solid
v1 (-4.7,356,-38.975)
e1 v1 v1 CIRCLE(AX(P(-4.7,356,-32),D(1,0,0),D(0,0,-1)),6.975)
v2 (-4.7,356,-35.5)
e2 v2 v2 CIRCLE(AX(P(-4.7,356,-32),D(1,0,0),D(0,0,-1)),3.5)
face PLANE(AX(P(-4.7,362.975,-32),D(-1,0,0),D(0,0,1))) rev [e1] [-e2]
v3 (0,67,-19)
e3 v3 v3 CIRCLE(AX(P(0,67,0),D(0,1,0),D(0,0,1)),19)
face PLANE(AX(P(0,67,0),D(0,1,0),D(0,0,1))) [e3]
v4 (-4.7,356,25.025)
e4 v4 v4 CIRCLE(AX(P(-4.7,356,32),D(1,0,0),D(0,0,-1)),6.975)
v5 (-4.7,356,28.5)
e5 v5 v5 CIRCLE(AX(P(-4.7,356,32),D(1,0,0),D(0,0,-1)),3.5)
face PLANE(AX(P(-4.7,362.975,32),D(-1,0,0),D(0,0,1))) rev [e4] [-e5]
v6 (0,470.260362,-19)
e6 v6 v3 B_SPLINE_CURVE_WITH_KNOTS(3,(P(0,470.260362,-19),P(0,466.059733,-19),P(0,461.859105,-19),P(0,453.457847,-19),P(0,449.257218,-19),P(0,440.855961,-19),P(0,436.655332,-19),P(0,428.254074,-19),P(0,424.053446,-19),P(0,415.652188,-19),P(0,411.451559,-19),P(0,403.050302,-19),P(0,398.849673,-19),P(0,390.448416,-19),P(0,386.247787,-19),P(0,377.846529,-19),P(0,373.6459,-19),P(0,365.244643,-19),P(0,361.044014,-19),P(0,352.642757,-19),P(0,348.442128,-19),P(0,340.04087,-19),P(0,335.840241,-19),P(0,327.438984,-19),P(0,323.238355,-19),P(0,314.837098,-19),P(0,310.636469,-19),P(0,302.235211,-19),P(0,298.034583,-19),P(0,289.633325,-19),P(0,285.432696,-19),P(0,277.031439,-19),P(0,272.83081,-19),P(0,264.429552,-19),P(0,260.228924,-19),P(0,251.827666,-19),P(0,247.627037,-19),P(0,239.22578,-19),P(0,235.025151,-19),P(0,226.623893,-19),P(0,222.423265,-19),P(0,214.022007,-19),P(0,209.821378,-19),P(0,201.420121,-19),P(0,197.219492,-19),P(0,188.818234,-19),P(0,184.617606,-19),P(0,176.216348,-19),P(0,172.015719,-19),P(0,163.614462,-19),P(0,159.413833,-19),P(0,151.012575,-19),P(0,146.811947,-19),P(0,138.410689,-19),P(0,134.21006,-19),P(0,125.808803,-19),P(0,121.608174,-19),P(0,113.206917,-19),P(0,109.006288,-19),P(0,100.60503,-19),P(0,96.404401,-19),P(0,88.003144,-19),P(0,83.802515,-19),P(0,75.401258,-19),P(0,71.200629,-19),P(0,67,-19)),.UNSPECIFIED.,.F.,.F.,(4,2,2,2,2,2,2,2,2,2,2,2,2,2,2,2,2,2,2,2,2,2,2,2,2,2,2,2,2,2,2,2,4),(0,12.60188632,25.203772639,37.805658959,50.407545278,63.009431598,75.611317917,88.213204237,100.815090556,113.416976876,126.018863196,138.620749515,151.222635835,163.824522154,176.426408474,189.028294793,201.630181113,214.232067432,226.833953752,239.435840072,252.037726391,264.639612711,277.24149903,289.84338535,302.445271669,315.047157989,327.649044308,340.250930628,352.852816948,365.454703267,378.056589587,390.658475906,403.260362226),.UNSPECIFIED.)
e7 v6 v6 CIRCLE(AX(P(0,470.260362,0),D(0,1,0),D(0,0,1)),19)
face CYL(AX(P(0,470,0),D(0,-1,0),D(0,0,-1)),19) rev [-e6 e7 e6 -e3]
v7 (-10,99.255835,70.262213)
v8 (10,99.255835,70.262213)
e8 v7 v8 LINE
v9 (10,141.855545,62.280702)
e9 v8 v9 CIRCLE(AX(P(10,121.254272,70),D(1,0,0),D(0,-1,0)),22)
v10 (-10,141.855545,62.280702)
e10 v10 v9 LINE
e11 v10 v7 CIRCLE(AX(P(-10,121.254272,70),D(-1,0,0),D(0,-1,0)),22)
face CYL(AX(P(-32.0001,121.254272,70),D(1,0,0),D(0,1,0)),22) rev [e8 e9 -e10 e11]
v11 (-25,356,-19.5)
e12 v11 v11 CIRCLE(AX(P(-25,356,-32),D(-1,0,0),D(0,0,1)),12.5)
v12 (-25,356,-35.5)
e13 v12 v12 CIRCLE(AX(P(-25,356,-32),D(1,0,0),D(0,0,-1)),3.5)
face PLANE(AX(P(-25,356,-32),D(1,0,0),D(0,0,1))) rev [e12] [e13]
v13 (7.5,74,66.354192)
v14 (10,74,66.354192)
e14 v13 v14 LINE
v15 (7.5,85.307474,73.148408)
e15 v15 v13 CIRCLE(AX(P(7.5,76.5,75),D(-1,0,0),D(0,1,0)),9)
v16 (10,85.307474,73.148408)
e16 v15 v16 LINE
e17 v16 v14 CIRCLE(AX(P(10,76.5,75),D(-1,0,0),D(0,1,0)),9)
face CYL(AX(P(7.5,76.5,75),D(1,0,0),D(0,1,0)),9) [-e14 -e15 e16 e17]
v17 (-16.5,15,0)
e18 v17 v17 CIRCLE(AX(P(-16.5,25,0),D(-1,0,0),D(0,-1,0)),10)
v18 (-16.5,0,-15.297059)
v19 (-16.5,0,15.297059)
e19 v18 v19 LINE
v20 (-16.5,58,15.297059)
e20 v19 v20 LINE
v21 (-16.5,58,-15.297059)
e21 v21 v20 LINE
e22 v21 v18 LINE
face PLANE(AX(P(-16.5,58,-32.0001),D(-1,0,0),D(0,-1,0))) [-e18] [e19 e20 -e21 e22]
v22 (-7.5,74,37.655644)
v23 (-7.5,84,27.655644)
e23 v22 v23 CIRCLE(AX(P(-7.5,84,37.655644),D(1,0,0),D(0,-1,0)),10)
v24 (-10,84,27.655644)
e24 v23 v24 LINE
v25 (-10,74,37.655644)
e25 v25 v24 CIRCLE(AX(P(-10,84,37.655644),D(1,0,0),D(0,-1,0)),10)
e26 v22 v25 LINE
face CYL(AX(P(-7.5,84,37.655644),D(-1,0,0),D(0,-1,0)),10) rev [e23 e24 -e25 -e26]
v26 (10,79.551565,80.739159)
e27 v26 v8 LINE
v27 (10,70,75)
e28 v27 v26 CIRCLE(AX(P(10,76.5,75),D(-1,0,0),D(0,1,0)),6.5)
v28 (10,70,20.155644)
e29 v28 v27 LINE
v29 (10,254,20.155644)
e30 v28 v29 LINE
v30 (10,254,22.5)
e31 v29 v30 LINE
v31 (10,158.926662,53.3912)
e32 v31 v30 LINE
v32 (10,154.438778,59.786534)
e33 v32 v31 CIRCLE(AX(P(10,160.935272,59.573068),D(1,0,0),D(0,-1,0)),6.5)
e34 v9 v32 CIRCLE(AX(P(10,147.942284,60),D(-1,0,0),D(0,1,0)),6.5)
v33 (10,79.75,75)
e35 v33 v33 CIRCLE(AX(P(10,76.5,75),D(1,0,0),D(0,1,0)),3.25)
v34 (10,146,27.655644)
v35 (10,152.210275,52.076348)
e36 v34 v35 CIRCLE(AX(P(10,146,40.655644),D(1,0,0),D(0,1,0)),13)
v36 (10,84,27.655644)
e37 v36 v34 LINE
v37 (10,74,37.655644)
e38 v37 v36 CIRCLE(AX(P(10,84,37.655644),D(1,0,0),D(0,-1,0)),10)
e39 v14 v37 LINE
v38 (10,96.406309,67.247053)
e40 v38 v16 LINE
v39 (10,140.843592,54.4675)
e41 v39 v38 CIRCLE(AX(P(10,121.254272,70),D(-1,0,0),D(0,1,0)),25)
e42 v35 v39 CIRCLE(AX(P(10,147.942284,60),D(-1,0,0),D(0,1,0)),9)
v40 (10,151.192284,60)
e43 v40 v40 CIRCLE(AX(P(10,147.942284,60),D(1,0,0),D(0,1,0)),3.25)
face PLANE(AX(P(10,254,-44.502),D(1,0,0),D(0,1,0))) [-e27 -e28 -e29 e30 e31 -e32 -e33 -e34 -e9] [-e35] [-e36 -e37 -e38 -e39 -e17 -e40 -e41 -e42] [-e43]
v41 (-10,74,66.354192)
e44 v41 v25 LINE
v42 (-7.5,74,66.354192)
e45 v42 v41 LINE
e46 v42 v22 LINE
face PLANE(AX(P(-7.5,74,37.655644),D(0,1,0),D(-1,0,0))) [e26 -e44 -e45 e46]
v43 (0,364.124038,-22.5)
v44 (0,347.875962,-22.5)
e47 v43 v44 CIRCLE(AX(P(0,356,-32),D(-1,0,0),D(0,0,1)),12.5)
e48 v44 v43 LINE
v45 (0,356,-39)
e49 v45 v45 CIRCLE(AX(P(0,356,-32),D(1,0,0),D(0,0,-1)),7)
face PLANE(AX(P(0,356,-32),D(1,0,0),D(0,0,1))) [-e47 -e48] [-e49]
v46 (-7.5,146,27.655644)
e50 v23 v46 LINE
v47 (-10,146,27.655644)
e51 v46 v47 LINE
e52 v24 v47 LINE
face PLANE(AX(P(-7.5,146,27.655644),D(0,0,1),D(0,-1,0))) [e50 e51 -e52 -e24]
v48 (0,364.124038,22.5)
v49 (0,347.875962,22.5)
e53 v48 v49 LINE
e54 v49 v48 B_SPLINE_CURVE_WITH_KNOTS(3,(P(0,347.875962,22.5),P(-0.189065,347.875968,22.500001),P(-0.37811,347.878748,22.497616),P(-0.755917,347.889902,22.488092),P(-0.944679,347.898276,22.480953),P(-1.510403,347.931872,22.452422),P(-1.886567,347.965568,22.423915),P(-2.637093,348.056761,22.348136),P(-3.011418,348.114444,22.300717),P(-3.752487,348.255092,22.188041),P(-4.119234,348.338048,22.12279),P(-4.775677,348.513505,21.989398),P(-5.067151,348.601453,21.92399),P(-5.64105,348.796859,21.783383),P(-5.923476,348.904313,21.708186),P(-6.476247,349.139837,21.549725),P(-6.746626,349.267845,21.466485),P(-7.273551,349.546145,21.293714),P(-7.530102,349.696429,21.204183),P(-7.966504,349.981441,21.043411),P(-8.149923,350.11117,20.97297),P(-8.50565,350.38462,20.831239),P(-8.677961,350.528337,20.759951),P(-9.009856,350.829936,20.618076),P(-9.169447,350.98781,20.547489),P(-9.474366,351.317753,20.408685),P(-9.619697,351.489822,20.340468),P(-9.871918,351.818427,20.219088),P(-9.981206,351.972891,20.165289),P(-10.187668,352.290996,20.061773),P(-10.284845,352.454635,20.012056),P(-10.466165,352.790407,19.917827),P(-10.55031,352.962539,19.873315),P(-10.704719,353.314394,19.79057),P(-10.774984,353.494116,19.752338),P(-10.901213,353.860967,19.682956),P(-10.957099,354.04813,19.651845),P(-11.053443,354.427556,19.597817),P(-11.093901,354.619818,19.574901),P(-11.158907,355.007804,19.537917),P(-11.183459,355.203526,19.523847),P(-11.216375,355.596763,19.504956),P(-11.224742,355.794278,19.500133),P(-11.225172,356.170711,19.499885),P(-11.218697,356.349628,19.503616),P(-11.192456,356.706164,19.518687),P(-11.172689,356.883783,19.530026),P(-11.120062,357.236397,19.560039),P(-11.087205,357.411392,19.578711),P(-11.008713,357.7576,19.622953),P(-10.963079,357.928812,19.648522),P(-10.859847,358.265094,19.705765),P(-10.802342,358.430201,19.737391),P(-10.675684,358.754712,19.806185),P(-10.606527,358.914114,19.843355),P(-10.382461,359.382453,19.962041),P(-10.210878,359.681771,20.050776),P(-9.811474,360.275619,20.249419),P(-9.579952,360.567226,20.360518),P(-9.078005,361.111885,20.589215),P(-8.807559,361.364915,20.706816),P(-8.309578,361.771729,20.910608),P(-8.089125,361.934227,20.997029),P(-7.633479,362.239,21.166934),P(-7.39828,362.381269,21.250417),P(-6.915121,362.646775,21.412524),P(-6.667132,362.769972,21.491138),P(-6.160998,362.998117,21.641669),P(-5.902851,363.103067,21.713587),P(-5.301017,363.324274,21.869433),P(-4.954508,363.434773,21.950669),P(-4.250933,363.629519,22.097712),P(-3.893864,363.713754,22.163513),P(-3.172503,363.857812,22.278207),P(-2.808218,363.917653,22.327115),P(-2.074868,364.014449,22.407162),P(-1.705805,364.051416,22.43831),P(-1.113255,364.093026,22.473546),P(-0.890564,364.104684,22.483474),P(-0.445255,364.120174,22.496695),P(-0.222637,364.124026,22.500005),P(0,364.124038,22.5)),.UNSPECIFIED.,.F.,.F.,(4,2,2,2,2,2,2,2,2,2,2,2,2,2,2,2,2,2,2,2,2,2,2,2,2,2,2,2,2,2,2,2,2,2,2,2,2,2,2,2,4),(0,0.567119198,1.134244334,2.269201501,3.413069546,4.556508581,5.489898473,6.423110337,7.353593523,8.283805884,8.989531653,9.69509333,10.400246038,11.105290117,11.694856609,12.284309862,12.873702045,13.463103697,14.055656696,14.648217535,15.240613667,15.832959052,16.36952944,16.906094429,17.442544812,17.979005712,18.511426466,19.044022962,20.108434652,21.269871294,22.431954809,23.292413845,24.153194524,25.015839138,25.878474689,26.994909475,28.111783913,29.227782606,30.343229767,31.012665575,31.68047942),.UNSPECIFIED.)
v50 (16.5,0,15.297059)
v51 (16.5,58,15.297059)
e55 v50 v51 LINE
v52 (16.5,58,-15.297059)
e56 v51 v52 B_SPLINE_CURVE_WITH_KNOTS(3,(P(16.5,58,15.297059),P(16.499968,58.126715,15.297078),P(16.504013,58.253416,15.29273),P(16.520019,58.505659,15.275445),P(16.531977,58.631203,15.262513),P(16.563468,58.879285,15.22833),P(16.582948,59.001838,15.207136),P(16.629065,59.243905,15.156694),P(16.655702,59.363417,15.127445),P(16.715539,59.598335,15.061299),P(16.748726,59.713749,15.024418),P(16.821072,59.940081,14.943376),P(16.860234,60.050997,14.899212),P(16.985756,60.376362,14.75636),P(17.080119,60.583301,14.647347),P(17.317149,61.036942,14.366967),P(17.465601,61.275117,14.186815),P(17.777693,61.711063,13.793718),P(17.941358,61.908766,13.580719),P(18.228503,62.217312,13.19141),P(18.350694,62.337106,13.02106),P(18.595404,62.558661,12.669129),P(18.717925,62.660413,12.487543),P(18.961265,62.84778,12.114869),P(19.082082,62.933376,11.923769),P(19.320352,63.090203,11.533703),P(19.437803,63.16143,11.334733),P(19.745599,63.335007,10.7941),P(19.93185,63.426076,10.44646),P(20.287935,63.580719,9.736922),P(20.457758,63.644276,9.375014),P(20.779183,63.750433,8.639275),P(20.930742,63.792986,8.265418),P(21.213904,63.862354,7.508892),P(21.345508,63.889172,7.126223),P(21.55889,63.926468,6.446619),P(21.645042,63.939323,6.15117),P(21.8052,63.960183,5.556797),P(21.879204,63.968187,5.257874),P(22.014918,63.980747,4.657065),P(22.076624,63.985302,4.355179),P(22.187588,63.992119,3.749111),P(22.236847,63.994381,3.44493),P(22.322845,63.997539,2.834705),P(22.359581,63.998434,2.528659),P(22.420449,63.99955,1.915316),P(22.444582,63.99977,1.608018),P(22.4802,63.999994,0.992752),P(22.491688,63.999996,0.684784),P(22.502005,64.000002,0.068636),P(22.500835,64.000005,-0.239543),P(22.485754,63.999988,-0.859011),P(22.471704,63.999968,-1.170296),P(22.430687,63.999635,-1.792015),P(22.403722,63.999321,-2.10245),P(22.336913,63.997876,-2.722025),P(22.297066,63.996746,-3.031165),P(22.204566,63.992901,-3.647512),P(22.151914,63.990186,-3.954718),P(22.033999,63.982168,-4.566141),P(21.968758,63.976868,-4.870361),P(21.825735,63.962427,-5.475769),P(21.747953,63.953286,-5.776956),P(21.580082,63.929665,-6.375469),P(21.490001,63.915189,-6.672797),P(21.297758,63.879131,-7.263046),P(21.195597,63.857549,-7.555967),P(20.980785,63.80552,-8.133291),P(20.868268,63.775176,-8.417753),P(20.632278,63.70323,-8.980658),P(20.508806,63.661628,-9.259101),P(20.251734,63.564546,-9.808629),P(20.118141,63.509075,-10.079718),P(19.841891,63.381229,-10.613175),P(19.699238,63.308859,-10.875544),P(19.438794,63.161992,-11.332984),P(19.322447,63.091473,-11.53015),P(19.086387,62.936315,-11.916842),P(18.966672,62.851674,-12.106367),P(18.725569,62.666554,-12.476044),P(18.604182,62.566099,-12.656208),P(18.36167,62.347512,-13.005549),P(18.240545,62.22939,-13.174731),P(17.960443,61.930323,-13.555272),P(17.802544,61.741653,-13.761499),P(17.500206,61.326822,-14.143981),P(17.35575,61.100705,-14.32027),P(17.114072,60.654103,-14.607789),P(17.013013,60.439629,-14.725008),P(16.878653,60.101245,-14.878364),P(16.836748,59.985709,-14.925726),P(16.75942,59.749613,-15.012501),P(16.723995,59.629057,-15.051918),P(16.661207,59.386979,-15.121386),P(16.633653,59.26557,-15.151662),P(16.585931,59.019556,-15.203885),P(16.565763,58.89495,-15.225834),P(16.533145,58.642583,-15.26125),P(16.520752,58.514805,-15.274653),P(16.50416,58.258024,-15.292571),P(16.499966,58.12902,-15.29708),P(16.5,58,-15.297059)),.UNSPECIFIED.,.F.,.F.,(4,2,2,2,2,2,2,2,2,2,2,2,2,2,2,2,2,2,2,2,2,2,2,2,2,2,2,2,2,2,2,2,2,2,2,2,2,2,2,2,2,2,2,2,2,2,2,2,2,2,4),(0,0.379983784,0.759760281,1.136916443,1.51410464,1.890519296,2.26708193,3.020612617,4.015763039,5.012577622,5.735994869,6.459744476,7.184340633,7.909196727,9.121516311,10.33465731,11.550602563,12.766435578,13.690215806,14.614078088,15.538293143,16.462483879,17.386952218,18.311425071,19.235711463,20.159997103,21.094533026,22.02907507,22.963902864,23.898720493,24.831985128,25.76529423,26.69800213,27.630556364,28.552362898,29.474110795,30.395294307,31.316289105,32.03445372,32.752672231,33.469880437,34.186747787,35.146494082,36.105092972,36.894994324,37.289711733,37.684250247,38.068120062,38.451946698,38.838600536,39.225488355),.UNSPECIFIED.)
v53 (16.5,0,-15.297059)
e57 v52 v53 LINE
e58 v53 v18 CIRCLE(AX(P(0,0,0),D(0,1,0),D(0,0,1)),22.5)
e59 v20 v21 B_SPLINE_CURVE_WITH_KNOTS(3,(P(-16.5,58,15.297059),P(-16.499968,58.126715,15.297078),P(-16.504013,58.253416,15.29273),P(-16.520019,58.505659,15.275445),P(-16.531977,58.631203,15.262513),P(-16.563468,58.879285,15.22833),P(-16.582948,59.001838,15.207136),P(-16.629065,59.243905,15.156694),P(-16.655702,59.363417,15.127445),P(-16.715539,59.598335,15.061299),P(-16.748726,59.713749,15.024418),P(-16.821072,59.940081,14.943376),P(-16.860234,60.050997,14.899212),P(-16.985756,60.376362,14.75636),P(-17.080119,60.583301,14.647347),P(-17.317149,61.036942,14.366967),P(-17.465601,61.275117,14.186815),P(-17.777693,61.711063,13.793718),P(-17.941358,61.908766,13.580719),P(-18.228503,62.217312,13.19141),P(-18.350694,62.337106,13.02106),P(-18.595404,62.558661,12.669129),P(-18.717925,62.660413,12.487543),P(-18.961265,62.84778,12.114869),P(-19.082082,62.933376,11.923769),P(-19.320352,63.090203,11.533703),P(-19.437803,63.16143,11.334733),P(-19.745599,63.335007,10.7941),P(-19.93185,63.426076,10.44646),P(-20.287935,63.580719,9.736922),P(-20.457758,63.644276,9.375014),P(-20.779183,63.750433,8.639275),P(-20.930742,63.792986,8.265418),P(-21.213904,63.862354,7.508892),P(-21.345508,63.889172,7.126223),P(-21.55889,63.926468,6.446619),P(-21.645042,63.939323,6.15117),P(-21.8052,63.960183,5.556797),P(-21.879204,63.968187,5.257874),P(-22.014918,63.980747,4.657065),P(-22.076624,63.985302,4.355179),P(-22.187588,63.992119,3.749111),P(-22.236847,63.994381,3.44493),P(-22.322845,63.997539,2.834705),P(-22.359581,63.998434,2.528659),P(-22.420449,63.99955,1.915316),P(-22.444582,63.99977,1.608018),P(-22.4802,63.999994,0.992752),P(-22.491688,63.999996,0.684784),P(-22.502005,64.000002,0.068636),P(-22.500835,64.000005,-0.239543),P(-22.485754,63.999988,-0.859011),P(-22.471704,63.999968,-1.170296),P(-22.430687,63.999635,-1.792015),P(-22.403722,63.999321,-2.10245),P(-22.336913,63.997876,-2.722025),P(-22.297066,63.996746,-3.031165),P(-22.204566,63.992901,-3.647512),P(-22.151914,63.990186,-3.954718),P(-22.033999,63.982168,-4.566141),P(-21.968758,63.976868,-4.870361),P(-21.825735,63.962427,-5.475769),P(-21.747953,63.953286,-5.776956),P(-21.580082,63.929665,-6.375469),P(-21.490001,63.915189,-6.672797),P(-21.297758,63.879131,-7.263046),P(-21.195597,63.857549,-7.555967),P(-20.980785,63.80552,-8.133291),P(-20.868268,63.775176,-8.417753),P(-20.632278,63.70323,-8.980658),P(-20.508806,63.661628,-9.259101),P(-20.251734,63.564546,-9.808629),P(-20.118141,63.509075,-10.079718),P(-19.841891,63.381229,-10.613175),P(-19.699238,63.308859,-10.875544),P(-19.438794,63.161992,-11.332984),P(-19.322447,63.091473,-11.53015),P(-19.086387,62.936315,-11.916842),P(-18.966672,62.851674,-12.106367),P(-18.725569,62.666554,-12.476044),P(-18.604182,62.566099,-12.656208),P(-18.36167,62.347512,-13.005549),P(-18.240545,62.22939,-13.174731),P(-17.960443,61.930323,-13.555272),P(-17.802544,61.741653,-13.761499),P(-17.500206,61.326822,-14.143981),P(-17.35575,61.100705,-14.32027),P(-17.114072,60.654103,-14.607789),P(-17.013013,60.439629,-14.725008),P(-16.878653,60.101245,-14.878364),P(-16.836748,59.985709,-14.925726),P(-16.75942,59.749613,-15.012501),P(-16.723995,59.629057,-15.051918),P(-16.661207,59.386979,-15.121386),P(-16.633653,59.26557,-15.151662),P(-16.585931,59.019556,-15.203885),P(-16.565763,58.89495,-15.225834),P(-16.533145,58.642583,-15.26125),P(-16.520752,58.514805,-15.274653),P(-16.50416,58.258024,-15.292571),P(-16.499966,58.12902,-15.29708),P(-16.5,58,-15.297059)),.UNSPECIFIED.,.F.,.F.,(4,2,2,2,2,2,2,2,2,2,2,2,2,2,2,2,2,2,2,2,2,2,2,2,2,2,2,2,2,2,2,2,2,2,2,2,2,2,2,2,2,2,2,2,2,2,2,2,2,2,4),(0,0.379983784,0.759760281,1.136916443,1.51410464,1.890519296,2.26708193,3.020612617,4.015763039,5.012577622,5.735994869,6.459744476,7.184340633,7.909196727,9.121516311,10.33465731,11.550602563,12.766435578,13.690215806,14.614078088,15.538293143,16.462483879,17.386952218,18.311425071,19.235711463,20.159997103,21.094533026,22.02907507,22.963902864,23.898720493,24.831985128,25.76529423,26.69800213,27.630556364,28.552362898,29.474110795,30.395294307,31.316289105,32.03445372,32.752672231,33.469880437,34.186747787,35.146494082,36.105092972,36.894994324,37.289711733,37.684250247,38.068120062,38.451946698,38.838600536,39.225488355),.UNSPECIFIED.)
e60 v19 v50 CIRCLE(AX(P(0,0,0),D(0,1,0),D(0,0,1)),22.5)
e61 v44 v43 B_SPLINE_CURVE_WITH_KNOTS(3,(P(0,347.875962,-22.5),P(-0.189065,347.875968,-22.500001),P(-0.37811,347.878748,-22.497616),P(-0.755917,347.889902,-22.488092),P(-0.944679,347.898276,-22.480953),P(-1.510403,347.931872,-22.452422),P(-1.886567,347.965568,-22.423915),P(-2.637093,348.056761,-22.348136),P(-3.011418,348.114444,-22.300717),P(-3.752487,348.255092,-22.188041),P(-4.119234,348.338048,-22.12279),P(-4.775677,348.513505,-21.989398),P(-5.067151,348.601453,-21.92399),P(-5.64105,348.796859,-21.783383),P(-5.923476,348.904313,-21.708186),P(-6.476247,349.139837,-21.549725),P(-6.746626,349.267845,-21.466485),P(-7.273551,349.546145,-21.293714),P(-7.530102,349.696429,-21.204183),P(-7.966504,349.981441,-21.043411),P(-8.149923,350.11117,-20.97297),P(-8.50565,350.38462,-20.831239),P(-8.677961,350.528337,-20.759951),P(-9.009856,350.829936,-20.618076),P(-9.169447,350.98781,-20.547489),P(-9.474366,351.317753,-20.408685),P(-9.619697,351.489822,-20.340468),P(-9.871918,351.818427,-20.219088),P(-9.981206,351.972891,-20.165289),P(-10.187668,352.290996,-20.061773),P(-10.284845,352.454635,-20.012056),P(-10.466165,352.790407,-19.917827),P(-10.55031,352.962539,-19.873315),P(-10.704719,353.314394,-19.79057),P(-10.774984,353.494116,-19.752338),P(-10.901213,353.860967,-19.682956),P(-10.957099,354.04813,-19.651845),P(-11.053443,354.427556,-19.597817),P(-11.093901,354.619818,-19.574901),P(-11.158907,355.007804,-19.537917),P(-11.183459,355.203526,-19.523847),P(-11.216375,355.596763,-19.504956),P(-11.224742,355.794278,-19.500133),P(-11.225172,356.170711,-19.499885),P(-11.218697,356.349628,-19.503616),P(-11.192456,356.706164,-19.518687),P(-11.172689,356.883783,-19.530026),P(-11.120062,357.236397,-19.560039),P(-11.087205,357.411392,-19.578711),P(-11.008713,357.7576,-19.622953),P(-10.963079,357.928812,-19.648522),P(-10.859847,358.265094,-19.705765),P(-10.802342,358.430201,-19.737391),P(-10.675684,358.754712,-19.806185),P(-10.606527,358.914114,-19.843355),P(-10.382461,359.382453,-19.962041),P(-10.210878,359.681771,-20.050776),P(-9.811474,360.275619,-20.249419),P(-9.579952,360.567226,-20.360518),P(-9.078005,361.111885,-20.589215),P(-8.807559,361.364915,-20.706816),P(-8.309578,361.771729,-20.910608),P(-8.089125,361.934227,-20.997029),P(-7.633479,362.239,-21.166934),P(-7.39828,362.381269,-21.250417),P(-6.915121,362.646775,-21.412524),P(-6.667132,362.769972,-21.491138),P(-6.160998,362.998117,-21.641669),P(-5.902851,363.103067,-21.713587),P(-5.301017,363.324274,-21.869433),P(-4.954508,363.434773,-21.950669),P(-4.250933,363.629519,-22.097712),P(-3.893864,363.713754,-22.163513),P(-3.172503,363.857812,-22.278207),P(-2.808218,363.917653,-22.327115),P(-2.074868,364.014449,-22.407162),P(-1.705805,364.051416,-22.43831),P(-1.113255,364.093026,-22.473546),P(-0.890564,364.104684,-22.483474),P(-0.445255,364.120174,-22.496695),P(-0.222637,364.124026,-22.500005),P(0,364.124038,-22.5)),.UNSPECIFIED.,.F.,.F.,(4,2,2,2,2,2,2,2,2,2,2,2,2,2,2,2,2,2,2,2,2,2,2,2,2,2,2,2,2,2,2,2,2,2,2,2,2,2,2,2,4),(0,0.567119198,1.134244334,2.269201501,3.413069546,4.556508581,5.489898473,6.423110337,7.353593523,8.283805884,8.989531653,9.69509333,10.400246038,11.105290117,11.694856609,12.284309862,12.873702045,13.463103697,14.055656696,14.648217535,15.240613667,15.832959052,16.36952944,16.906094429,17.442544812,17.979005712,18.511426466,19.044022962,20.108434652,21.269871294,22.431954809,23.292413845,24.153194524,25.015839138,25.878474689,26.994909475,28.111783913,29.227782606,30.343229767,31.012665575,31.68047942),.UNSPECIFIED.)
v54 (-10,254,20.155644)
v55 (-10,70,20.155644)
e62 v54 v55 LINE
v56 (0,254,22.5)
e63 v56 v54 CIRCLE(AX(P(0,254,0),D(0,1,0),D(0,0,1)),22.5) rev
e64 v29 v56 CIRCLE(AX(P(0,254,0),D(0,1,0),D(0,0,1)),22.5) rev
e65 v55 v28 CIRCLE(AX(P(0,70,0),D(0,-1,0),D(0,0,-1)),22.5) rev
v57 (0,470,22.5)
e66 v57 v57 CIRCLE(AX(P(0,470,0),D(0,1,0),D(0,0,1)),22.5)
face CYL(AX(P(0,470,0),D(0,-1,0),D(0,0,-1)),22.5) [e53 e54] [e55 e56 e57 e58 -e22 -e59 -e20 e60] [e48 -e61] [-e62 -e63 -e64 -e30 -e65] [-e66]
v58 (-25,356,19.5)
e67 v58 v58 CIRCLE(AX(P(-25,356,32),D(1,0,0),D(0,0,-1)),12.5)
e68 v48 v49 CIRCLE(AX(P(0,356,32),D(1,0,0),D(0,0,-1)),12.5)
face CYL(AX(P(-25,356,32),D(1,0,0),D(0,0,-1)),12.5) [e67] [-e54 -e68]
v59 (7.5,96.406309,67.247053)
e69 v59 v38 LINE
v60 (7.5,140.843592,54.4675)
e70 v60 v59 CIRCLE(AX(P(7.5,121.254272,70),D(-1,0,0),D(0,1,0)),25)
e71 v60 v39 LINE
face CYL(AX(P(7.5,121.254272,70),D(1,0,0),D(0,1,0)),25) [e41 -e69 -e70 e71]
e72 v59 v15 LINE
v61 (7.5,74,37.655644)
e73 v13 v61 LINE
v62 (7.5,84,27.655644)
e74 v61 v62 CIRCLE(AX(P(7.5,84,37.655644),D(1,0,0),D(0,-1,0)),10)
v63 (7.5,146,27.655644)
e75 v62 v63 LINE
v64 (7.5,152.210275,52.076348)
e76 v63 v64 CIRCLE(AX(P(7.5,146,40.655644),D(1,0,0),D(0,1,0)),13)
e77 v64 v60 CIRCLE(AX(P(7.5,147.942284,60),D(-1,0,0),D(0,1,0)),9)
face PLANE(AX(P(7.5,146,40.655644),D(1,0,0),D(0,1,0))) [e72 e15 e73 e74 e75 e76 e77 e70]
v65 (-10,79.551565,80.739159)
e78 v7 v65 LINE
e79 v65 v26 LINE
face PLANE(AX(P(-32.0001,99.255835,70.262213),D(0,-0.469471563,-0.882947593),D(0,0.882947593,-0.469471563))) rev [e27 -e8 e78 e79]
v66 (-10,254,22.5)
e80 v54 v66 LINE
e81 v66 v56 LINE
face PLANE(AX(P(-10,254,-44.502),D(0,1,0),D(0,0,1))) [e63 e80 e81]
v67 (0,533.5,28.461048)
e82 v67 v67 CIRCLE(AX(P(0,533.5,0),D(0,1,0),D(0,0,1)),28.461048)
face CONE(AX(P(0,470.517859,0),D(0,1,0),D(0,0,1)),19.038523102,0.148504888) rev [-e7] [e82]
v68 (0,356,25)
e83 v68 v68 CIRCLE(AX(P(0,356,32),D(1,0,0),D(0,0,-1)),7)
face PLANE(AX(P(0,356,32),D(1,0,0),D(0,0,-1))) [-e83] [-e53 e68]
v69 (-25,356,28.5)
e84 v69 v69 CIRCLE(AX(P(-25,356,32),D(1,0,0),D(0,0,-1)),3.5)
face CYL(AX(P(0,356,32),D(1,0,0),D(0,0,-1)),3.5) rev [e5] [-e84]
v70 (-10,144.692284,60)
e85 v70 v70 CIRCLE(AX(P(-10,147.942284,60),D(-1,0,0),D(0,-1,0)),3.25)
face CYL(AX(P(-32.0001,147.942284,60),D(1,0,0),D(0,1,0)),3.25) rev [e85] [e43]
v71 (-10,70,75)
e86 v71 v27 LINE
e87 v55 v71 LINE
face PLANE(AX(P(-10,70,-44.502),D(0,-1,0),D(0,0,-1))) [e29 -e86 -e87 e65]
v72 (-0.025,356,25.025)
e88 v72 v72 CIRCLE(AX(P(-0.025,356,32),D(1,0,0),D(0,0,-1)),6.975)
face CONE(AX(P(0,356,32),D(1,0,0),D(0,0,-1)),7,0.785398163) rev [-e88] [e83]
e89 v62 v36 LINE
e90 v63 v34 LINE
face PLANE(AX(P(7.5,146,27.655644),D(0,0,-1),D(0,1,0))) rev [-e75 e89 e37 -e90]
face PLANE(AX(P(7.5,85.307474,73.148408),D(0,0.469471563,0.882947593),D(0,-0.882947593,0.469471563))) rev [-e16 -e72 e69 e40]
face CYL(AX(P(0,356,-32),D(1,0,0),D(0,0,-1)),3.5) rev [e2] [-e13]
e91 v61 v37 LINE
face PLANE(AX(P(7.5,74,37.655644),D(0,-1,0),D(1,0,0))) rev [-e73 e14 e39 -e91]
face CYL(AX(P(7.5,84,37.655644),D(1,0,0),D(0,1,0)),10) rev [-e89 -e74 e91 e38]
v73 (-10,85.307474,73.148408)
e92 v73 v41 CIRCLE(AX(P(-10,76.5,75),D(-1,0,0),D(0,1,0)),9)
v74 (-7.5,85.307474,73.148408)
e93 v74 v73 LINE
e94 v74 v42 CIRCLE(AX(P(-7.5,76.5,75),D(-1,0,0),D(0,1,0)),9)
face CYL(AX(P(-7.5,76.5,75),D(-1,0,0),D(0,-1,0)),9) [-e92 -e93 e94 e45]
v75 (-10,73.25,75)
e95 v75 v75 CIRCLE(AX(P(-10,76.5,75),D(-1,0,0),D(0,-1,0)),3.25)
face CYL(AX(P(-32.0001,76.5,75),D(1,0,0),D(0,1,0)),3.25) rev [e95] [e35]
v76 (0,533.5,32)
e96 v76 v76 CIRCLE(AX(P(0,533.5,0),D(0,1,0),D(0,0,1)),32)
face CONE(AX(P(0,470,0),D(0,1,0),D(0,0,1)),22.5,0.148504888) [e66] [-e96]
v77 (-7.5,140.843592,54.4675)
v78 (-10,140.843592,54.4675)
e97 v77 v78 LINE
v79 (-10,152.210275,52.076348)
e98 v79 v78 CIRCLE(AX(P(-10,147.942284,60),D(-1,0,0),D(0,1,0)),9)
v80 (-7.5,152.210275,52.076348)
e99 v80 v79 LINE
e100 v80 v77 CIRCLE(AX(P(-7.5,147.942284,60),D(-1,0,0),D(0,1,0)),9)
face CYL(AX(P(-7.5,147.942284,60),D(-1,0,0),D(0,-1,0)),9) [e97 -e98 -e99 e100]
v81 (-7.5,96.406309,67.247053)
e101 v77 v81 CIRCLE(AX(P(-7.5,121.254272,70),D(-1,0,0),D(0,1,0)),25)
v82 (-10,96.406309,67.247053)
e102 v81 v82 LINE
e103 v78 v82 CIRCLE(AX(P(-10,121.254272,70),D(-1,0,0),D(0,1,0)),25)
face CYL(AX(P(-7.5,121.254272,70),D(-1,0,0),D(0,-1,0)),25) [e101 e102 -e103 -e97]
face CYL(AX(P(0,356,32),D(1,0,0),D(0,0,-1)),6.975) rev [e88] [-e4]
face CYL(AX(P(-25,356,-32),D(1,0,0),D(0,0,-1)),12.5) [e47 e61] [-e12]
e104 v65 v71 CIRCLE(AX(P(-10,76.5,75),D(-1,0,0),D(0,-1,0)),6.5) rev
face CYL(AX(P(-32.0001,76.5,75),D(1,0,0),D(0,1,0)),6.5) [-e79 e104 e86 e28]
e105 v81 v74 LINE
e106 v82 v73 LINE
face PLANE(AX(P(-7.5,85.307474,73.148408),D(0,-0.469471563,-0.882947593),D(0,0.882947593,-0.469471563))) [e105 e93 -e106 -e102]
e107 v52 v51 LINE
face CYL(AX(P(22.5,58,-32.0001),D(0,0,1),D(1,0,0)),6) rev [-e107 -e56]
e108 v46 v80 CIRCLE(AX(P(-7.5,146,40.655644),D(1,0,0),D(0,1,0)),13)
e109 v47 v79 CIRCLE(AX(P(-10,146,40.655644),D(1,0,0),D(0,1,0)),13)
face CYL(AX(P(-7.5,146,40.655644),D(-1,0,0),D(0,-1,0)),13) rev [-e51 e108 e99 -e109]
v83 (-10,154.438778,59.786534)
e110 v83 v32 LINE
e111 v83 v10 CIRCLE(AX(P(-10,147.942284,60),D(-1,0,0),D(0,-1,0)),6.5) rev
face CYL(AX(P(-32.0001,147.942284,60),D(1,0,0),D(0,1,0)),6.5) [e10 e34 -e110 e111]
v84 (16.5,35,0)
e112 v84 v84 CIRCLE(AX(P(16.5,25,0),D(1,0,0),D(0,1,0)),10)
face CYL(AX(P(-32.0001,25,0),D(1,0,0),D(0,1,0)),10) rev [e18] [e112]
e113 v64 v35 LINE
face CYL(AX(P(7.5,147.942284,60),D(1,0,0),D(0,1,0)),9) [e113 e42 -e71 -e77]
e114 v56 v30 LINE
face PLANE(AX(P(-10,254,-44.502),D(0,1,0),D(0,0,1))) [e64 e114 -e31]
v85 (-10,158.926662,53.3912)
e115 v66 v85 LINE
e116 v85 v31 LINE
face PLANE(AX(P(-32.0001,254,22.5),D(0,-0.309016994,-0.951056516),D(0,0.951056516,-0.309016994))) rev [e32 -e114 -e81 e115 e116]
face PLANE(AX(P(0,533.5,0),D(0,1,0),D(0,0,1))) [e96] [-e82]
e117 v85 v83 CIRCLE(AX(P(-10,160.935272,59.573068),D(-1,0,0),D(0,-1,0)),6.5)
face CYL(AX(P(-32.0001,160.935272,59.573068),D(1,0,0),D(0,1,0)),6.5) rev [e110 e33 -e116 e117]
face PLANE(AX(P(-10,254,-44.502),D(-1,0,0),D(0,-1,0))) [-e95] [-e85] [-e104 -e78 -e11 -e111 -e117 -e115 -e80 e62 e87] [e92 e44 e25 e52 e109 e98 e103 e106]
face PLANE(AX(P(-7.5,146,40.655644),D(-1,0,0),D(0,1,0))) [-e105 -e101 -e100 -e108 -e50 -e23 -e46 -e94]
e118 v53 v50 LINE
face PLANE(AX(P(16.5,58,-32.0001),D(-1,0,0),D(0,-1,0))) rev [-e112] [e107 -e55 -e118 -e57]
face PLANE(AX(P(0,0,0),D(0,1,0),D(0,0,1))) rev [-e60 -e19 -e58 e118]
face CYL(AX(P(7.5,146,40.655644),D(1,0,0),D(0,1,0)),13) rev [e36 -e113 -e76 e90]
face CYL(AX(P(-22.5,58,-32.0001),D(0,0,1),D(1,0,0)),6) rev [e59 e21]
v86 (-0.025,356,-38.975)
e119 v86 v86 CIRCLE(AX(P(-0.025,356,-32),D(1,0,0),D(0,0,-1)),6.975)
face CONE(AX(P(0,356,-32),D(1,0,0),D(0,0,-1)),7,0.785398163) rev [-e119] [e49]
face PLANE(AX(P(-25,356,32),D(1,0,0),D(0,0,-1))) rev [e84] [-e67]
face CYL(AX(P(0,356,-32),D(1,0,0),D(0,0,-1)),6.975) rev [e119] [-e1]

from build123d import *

# Parameters (mm, degrees)
SKETCH1_R                = 22.5
BOSS_EXTRUDE1_DEPTH      = 470
SKETCH2_R                = 32
CUT_EXTRUDE1_DEPTH       = 536.415959904
HOLE1_START              = -16.5
HOLE1_OUTLINE_R          = 10
HOLE1_DEPTH              = 33
SKETCH5_R                = 12.5
BOSS_EXTRUDE2_DEPTH      = 25
BOSS_EXTRUDE3_REACH      = 553.123
BOSS_EXTRUDE3_END_RADIUS = 22.5
SKETCH8_W                = 20
SKETCH8_H                = 184
CUT_EXTRUDE2_DEPTH       = 543.665873365
SKETCH11_R               = 3.25
CUT_EXTRUDE3_DEPTH       = 542.321069343
CUT_EXTRUDE4_DEPTH       = 2.5


# Read off the part's stored shape, not the designer's step: Shell1, Hole1
with BuildPart() as part:
    # Sketch1 → Boss-Extrude1 (new body)
    with BuildSketch(Plane(origin=(0, 0, 0), x_dir=(1, 0, 0), z_dir=(0, 1, 0))):
        with Locations(Location((0, 0, 0), (0, 0, 90))):
            Circle(SKETCH1_R)
    extrude(amount=BOSS_EXTRUDE1_DEPTH)

    # Sketch2 → section 0 of loft1
    with BuildSketch(Plane(origin=(0, 533.5, 0), x_dir=(1, 0, 0), z_dir=(0, 1, 0)), mode=Mode.PRIVATE) as loft1_s0:
        Circle(SKETCH2_R)
    # loft up to a face of the part (loft1)
    loft([loft1_s0.sketch, Face(Wire([part.edges().sort_by_distance((-16.401794117, 470, 15.402309883))[0]]))])

    # Shell1 outline → Shell1 (revolve, cut)
    with BuildSketch(Plane.XY):
        Polygon((28.461048171, 533.5), (0, 533.5), (0, 67), (19, 67), (19, 470.260362226), align=None)
    revolve(axis=Axis((0, 0, 0), (0, 1, 0)), mode=Mode.SUBTRACT)

    # Sketch3 → Cut-Extrude1 (cut, symmetric)
    with BuildSketch(Plane.XY):
        with BuildLine():
            Line((22.5, 64), (44.504485309, 64))
            Line((44.504485309, 64), (44.504485309, -12.1793828))
            Line((44.504485309, -12.1793828), (16.5, -12.1793828))
            Line((16.5, -12.1793828), (16.5, 58))
            ThreePointArc((16.5, 58), (18.257359313, 62.242640687), (22.5, 64))
        make_face()
    cut_extrude1 = extrude(amount=CUT_EXTRUDE1_DEPTH, both=True, mode=Mode.SUBTRACT)

    # Mirror1: Cut-Extrude1 across plane
    add(cut_extrude1.mirror(Plane(origin=(0, 0, 0), x_dir=(0, 0, 1), z_dir=(1, 0, 0))), mode=Mode.SUBTRACT)

    # Hole1 outline → Hole1 (cut)
    with BuildSketch(Plane.YZ.offset(HOLE1_START)):
        with Locations((25, 0)):
            Circle(HOLE1_OUTLINE_R)
    extrude(amount=HOLE1_DEPTH, mode=Mode.SUBTRACT)

    # Sketch5 → Boss-Extrude2 (add)
    with BuildSketch(Plane(origin=(0, 0, 0), x_dir=(0, 0, -1), z_dir=(1, 0, 0))):
        with Locations((-32, 356)):
            Circle(SKETCH5_R)
    boss_extrude2 = extrude(amount=-BOSS_EXTRUDE2_DEPTH)

    # Sketch7 → CBORE for M6 Hex Head Machine Screw1 (revolve, cut)
    with BuildSketch(Plane(origin=(0, 356, 32), x_dir=(0, 0, -1), z_dir=(0, 1, 0))):
        Polygon((0, 0), (0, 32.0001), (3.5, 32.0001), (3.5, 4.7), (6.975, 4.7), (6.975, 0.025), (7, 0), align=None)
    cbore_for_m6_hex_head_machine_screw1 = revolve(axis=Axis((6.35, 356, 32), (-1, 0, 0)), mode=Mode.SUBTRACT)

    # Mirror2: Boss-Extrude2, CBORE for M6 Hex Head Machine Screw1 across plane
    add(boss_extrude2.mirror(Plane.XY))
    add(cbore_for_m6_hex_head_machine_screw1.mirror(Plane.XY), mode=Mode.SUBTRACT)

    # Boss-Extrude3: up to this cylinder (the profile starts outside it)
    boss_extrude3_end = Plane(origin=(0, 162, 0), z_dir=(0, -1, 0)) * Cylinder(BOSS_EXTRUDE3_END_RADIUS, 1152.246, mode=Mode.PRIVATE)
    # Sketch8 → Boss-Extrude3 (add, up to the surface)
    with BuildSketch(Plane.XY.offset(90), mode=Mode.PRIVATE) as boss_extrude3_sk1:
        with Locations((0, 162)):
            Rectangle(SKETCH8_W, SKETCH8_H)
    boss_extrude3_tool1 = extrude(boss_extrude3_sk1.sketch, amount=-BOSS_EXTRUDE3_REACH, mode=Mode.PRIVATE) - boss_extrude3_end
    add(boss_extrude3_tool1.solids().sort_by_distance((0, 162, 90))[0])

    # Sketch10 → Cut-Extrude2 (cut, through all)
    with BuildSketch(Plane(origin=(10, 0, 0), x_dir=(0, 0, -1), z_dir=(1, 0, 0))):
        with BuildLine():
            Line((-90, 70), (-90, 254))
            Line((-90, 254), (-22.5, 254))
            Line((-22.5, 254), (-53.39120023, 158.926661609))
            ThreePointArc((-53.39120023, 158.926661609), (-55.83933924, 155.614626187), (-59.786533793, 154.438778235))
            ThreePointArc((-59.786533793, 154.438778235), (-66.375955373, 149.206085442), (-62.280701754, 141.855544753))
            ThreePointArc((-62.280701754, 141.855544753), (-48.37626649, 117.202834204), (-70.262213343, 99.255834796))
            Line((-70.262213343, 99.255834796), (-80.739159354, 79.551565158))
            ThreePointArc((-80.739159354, 79.551565158), (-80.571587455, 73.152252513), (-75, 70))
            Line((-75, 70), (-90, 70))
        make_face()
    extrude(amount=-CUT_EXTRUDE2_DEPTH, mode=Mode.SUBTRACT)

    # Sketch11 → Cut-Extrude3 (cut, through all)
    with BuildSketch(Plane(origin=(10, 0, 0), x_dir=(0, 0, -1), z_dir=(1, 0, 0))):
        with Locations(Location((-60, 147.942284398, 0), (0, 0, 90))):
            Circle(SKETCH11_R)
        with Locations(Location((-75, 76.5, 0), (0, 0, 90))):
            Circle(SKETCH11_R)
    extrude(amount=-CUT_EXTRUDE3_DEPTH, mode=Mode.SUBTRACT)

    # Sketch12 → Cut-Extrude4 (cut)
    with BuildSketch(Plane(origin=(10, 0, 0), x_dir=(0, 0, -1), z_dir=(1, 0, 0))):
        with BuildLine():
            Line((-27.655644371, 146), (-27.655644371, 84))
            ThreePointArc((-27.655644371, 84), (-30.584576559, 76.928932188), (-37.655644371, 74))
            Line((-37.655644371, 74), (-66.354191767, 74))
            ThreePointArc((-66.354191767, 74), (-67.285494294, 81.135342674), (-73.14840788, 85.307474475))
            Line((-73.14840788, 85.307474475), (-67.247053013, 96.406308753))
            ThreePointArc((-67.247053013, 96.406308753), (-45.973818024, 114.344671566), (-54.467499716, 140.843591518))
            ThreePointArc((-54.467499716, 140.843591518), (-51.192765452, 146.089551388), (-52.076348436, 152.210275248))
            ThreePointArc((-52.076348436, 152.210275248), (-37.4516744, 158.598991088), (-27.655644371, 146))
        make_face()
    cut_extrude4 = extrude(amount=-CUT_EXTRUDE4_DEPTH, mode=Mode.SUBTRACT)

    # Mirror3: Cut-Extrude4 across plane
    add(cut_extrude4.mirror(Plane(origin=(0, 0, 0), x_dir=(0, 0, 1), z_dir=(1, 0, 0))), mode=Mode.SUBTRACT)


solid = part.part
